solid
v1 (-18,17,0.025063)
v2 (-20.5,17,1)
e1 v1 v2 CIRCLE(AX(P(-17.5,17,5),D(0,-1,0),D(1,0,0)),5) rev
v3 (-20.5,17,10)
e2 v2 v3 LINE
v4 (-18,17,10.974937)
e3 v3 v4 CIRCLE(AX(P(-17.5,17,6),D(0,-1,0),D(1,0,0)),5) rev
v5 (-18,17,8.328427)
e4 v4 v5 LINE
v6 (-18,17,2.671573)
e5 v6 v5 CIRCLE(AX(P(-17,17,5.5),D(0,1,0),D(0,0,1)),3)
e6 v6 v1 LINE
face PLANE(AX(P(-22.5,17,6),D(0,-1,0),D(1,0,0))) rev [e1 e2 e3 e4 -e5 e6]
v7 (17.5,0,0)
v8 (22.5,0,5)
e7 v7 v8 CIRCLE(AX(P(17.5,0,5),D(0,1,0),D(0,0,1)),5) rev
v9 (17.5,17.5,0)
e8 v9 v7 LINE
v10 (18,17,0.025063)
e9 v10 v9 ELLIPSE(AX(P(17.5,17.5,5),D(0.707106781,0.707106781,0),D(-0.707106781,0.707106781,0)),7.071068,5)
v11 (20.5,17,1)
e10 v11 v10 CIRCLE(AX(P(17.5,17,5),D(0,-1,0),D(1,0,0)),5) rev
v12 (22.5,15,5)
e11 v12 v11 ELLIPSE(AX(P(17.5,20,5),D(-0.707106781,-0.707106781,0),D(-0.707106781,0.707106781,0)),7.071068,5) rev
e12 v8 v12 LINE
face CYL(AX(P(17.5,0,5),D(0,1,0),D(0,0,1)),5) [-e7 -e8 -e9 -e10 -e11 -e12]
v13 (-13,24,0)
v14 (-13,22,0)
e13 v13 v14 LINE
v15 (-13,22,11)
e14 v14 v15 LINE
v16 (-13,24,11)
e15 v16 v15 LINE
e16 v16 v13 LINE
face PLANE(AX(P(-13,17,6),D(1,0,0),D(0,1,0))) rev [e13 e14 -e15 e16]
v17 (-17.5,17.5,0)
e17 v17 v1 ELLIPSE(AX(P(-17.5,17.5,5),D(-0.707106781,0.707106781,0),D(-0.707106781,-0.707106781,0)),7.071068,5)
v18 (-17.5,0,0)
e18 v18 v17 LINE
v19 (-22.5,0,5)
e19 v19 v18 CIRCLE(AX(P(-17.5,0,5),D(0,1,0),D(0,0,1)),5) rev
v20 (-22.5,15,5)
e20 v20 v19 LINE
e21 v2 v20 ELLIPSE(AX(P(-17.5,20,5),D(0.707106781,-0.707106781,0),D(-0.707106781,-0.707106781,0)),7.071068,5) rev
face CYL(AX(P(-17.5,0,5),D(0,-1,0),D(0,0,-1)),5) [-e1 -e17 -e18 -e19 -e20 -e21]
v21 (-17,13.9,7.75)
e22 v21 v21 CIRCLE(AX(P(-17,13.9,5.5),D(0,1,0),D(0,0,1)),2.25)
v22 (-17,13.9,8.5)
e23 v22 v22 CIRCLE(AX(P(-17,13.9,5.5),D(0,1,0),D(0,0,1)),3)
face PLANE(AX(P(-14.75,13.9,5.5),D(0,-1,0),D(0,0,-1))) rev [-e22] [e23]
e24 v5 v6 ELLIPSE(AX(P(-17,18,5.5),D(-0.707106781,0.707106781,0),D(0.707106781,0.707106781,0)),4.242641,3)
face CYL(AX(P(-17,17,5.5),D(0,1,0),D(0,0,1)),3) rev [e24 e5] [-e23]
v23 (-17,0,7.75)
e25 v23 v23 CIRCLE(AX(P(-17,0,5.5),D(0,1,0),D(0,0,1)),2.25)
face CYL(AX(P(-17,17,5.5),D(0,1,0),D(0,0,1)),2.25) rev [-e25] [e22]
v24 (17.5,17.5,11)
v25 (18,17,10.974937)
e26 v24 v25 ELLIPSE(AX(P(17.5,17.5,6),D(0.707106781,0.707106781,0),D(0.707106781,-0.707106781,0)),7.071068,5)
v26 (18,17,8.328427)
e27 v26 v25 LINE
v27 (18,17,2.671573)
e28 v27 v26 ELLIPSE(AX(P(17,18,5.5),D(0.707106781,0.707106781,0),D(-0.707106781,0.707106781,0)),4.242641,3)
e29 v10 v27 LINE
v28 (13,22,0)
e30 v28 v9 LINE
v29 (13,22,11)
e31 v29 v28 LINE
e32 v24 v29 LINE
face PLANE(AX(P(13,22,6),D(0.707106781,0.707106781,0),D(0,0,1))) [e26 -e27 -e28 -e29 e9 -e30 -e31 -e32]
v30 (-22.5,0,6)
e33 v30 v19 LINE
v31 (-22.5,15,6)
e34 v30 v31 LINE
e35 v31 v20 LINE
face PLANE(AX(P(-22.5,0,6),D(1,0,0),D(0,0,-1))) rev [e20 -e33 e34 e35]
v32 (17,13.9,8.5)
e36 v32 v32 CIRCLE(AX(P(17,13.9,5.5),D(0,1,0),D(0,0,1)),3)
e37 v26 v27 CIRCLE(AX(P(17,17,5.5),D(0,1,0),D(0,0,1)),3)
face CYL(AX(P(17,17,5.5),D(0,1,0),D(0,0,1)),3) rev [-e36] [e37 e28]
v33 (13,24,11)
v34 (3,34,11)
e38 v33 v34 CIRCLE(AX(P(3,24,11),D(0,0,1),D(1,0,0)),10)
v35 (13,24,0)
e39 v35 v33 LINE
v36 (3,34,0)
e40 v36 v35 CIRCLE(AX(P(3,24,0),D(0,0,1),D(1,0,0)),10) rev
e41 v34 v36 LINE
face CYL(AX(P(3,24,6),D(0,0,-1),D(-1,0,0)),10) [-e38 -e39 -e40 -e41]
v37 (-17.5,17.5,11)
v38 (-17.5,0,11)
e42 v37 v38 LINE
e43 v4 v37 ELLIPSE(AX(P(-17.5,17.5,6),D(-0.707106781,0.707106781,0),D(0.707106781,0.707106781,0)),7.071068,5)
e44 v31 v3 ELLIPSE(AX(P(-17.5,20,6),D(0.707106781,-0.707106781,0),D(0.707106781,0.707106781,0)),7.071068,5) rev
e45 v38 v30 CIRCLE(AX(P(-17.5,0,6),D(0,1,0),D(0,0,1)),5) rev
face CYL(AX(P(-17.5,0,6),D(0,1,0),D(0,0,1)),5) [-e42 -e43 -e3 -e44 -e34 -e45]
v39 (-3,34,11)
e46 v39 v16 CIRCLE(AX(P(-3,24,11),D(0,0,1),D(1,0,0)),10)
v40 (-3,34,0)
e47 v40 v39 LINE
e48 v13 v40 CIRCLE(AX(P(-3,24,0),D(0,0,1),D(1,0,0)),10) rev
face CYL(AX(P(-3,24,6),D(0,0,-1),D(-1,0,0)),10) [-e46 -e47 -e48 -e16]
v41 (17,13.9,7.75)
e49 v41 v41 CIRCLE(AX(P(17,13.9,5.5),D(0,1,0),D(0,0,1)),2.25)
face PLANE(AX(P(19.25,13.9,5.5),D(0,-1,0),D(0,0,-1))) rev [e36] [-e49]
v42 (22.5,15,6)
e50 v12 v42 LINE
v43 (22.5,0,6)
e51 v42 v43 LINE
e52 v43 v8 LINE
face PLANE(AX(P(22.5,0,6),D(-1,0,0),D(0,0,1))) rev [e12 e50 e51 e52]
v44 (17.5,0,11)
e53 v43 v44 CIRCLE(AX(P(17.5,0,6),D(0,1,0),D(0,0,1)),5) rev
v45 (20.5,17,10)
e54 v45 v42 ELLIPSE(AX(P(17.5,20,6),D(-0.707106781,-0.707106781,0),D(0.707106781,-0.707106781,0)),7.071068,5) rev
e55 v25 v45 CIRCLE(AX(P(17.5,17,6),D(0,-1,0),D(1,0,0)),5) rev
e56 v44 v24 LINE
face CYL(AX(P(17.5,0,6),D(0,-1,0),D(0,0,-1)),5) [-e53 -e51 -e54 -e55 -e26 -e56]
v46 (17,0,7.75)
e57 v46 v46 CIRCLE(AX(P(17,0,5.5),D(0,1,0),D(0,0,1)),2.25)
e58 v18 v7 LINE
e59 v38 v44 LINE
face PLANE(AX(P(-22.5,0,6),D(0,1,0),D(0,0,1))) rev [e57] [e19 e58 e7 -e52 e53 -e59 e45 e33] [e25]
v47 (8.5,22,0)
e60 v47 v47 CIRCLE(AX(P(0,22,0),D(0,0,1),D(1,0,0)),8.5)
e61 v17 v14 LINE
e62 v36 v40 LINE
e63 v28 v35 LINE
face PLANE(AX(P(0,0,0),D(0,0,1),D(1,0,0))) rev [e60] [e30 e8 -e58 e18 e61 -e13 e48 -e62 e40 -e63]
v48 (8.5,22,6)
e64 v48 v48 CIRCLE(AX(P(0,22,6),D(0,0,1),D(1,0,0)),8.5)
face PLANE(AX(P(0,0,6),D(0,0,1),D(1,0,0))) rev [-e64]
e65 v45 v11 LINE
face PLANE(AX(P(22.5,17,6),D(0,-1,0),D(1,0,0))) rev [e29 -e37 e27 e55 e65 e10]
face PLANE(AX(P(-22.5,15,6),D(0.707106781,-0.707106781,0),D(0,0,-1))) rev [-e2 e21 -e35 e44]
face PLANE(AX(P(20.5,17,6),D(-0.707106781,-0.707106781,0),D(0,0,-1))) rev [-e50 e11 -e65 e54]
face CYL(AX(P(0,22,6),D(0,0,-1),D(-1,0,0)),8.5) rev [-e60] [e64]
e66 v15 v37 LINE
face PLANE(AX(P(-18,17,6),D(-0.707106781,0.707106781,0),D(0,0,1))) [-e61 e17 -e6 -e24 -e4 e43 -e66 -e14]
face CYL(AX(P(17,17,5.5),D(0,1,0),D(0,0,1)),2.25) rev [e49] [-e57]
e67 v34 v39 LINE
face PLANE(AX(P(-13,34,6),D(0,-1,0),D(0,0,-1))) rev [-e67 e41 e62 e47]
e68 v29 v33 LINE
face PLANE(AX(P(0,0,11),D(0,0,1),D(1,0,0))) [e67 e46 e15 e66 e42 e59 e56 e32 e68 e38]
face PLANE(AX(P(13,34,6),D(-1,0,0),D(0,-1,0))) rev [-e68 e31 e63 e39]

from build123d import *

# Parameters (mm, degrees)
CROQUIS1_R                                           = 8.5
SALIENTE_EXTRUIR1_DEPTH                              = 6
SALIENTE_EXTRUIR2_DEPTH                              = 5
REFRENTADO_PARA_TORNILLO_CON_CABEZA_TRON_D           = 4.5
REFRENTADO_PARA_TORNILLO_CON_CABEZA_TRON_CBORE_D     = 6
REFRENTADO_PARA_TORNILLO_CON_CABEZA_TRON_CBORE_DEPTH = 3.1
CHAFL_N1_SIZE                                        = 5
REDONDEO1_R                                          = 10
CHAFL_N2_SIZE                                        = 2
REDONDEO2_R                                          = 5
REDONDEO3_R                                          = 5
REDONDEO4_R                                          = 5
REDONDEO5_R                                          = 5


with BuildPart() as part:
    # Croquis1 → Saliente-Extruir1 (new body)
    with BuildSketch(Plane.XY):
        Polygon((-22.5, 0), (22.5, 0), (22.5, 17), (13, 17), (13, 34), (-13, 34), (-13, 17), (-22.5, 17), align=None)
        with Locations((0, 22)):
            Circle(CROQUIS1_R, mode=Mode.SUBTRACT)
    extrude(amount=SALIENTE_EXTRUIR1_DEPTH)

    # Croquis2 → Saliente-Extruir2 (add)
    with BuildSketch(Plane.XY.offset(6)):
        Polygon((22.5, 0), (22.5, 17), (13, 17), (13, 34), (-13, 34), (-13, 17), (-22.5, 17), (-22.5, 0), align=None)
    extrude(amount=SALIENTE_EXTRUIR2_DEPTH)

    # Refrentado para tornillo con cabeza troncocónica de M41 (through all)
    with Locations(Plane(origin=(17, 17, 5.5), x_dir=(1, 0, 0), z_dir=(0, 1, 0))):
        with Locations((0, 0), (-34, 0)):
            CounterBoreHole(REFRENTADO_PARA_TORNILLO_CON_CABEZA_TRON_D / 2, REFRENTADO_PARA_TORNILLO_CON_CABEZA_TRON_CBORE_D / 2, REFRENTADO_PARA_TORNILLO_CON_CABEZA_TRON_CBORE_DEPTH)

    # Chaflán1
    # the kernel refuses this chamfer: 5 mm, written as the material it adds along each edge
    with BuildSketch(Plane(origin=(-13, 17, 11), x_dir=(-0.9996219169112968, -0.02749587661058561, 0), z_dir=(0, 0, -1))) as chafl_n1_piece_1_section:
        Polygon((CHAFL_N1_SIZE * 0.999621916911, CHAFL_N1_SIZE * 0.0274958766106), (-CHAFL_N1_SIZE * 0.0274958766106, CHAFL_N1_SIZE * 0.999621916911), (0, 0), align=None)
    chafl_n1_piece_1 = extrude(amount=11, mode=Mode.PRIVATE)
    chafl_n1_piece_1 = chafl_n1_piece_1 - Plane(origin=(-17, 17.70483049, 5.5), x_dir=(1, 0, 0), z_dir=(0, 1, 0)) * Cylinder(3, 42, mode=Mode.PRIVATE)
    add(chafl_n1_piece_1)
    with BuildSketch(Plane(origin=(13, 17, 0), x_dir=(0.9996219169112968, -0.027495876610585626, 0), z_dir=(0, 0, 1))) as chafl_n1_piece_2_section:
        Polygon((CHAFL_N1_SIZE * 0.999621916911, CHAFL_N1_SIZE * 0.0274958766106), (-CHAFL_N1_SIZE * 0.0274958766106, CHAFL_N1_SIZE * 0.999621916911), (0, 0), align=None)
    chafl_n1_piece_2 = extrude(amount=11, mode=Mode.PRIVATE)
    chafl_n1_piece_2 = chafl_n1_piece_2 - Plane(origin=(17, 17.70483049, 5.5), x_dir=(1, 0, 0), z_dir=(0, 1, 0)) * Cylinder(3, 42, mode=Mode.PRIVATE)
    add(chafl_n1_piece_2)

    # Redondeo1
    redondeo1_edges = [part.edges().sort_by_distance(p)[0] for p in [
        (-13, 34, 5.5),
        (13, 34, 5.5),
    ]]
    fillet(redondeo1_edges, radius=REDONDEO1_R)

    # Chaflán2
    chafl_n2_edges = [part.edges().sort_by_distance(p)[0] for p in [
        (-22.5, 17, 5.5),
        (22.5, 17, 5.5),
    ]]
    chamfer(chafl_n2_edges, length=CHAFL_N2_SIZE)

    # Redondeo2
    # the kernel refuses this fillet: 5 mm, written as the material it takes off along each edge
    with BuildSketch(Plane(origin=(22.5, -12.5, 11), x_dir=(0, 0, -1), z_dir=(0, 1, 0))) as redondeo2_piece_1:
        with BuildLine():
            CenterArc((REDONDEO2_R, REDONDEO2_R), REDONDEO2_R, 180, 90)
            Line((0, REDONDEO2_R), (0, 0))
            Line((0, 0), (REDONDEO2_R, 0))
        make_face()
    extrude(amount=40, mode=Mode.SUBTRACT)

    # Redondeo3
    redondeo3_edges = [part.edges().sort_by_distance(p)[0] for p in [
        (-22.5, 7.5, 0),
    ]]
    fillet(redondeo3_edges, radius=REDONDEO3_R)

    # Redondeo4
    # the kernel refuses this fillet: 5 mm, written as the material it takes off along each edge
    with BuildSketch(Plane(origin=(22.5, -12.5, 0), x_dir=(-1, 0, 0), z_dir=(0, 1, 0))) as redondeo4_piece_1:
        with BuildLine():
            CenterArc((REDONDEO4_R, REDONDEO4_R), REDONDEO4_R, 180, 90)
            Line((0, REDONDEO4_R), (0, 0))
            Line((0, 0), (REDONDEO4_R, 0))
        make_face()
    extrude(amount=40, mode=Mode.SUBTRACT)

    # Redondeo5
    # the kernel refuses this fillet: 5 mm, written as the material it takes off along each edge
    with BuildSketch(Plane(origin=(-22.5, 27.5, 11), x_dir=(0, 0, -1), z_dir=(0, -1, 0))) as redondeo5_piece_1:
        with BuildLine():
            CenterArc((REDONDEO5_R, REDONDEO5_R), REDONDEO5_R, 180, 90)
            Line((0, REDONDEO5_R), (0, 0))
            Line((0, 0), (REDONDEO5_R, 0))
        make_face()
    extrude(amount=40, mode=Mode.SUBTRACT)


solid = part.part
